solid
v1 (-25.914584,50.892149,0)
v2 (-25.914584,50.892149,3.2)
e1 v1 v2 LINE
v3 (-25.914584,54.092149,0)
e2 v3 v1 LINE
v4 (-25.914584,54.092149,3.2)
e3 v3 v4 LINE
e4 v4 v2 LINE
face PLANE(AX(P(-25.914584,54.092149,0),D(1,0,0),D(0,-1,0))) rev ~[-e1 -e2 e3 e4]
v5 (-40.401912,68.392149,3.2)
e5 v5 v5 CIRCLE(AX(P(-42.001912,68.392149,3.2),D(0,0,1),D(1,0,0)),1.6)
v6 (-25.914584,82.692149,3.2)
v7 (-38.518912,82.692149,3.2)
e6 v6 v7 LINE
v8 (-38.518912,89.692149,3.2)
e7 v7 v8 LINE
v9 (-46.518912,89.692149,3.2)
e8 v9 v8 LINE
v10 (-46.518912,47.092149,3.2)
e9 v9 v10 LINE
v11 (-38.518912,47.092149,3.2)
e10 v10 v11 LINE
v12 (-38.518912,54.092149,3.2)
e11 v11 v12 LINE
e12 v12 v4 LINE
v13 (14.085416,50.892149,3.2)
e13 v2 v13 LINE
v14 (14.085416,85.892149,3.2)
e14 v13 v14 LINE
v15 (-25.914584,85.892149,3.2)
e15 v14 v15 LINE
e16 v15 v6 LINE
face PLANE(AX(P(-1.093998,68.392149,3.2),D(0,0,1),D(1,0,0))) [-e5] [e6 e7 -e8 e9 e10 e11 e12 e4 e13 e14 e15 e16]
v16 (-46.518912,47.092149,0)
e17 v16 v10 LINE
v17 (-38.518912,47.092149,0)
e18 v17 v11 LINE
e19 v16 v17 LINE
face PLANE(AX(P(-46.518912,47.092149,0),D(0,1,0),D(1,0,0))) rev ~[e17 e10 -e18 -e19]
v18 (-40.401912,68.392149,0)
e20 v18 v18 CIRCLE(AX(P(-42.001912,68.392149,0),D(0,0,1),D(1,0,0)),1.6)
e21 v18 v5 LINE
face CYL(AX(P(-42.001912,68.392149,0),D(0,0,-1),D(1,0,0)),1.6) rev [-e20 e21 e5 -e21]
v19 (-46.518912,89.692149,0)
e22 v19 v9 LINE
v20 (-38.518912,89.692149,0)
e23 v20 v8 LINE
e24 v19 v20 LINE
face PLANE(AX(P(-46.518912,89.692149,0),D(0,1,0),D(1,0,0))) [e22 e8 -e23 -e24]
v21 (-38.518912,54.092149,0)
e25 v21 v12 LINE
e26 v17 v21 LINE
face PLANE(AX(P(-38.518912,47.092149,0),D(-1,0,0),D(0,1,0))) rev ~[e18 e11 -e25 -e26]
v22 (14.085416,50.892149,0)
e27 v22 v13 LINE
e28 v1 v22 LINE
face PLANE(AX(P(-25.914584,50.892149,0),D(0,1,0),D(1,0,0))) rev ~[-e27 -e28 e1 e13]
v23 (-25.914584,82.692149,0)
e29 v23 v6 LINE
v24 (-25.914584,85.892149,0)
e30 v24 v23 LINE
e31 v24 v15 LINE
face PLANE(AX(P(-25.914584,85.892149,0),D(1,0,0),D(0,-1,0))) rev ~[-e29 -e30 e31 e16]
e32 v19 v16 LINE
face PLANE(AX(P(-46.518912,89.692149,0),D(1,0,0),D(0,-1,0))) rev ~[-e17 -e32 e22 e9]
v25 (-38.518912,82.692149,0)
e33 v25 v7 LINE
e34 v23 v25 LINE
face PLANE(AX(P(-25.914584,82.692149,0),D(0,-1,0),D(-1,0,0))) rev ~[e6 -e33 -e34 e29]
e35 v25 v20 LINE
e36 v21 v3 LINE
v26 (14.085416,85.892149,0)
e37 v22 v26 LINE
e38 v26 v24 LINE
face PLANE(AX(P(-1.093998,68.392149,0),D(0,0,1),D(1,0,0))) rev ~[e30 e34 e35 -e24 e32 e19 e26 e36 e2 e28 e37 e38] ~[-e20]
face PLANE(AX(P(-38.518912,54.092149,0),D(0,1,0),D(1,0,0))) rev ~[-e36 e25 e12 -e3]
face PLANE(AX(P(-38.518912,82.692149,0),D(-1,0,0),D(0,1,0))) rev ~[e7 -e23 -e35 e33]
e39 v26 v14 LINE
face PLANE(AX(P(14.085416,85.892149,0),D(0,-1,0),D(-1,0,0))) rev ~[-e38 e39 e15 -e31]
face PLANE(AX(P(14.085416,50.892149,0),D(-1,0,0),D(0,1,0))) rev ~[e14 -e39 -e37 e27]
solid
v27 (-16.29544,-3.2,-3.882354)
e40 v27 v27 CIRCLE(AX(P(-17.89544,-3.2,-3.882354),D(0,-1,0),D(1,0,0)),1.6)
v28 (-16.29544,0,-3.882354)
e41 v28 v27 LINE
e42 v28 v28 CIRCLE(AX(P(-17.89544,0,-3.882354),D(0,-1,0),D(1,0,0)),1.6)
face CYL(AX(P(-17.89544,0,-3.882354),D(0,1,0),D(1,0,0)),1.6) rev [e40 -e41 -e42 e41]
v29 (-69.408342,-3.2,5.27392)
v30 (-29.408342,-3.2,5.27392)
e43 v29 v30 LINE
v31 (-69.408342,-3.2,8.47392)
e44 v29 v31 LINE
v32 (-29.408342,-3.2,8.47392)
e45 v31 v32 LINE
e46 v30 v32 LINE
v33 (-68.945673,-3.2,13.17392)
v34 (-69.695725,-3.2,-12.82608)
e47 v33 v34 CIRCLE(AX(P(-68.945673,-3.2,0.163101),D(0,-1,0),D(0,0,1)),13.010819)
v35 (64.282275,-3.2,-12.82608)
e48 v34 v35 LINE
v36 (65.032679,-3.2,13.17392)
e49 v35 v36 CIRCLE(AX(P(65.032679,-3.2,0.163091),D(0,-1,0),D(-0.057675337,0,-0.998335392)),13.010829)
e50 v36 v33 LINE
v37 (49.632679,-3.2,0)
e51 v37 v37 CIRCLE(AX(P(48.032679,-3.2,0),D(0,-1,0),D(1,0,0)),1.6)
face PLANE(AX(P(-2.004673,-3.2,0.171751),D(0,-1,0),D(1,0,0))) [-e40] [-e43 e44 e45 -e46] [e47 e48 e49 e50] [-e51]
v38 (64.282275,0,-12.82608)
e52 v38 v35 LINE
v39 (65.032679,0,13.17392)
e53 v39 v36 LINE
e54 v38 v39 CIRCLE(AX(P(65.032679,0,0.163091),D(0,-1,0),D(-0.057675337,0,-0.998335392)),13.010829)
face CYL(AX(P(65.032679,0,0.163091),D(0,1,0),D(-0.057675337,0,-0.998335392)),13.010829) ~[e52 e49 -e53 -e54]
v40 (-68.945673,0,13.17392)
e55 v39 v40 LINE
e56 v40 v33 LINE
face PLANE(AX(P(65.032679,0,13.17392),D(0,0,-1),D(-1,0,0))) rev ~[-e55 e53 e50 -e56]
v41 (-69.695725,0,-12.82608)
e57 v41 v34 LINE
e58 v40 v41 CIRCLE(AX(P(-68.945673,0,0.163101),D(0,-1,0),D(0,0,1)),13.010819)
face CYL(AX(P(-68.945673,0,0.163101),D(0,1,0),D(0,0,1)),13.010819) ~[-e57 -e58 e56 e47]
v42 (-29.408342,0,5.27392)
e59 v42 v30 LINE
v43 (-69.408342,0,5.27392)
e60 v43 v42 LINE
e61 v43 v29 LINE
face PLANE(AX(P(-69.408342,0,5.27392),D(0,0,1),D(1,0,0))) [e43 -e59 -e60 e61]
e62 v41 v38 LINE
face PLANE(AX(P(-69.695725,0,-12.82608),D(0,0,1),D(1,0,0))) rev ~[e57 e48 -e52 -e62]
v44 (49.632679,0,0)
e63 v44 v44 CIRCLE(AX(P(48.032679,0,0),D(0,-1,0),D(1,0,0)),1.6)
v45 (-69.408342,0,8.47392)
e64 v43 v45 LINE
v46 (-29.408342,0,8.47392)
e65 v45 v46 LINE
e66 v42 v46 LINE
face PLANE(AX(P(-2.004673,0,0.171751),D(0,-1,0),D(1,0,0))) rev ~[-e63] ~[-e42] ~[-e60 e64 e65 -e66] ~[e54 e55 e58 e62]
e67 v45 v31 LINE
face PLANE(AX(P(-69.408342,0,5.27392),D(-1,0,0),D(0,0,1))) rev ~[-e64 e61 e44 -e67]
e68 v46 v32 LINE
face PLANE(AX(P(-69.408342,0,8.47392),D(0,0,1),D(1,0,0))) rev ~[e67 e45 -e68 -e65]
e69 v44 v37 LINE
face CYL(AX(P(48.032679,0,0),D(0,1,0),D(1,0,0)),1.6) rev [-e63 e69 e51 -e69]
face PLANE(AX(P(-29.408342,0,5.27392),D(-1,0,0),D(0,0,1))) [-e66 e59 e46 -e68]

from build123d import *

# Parameters (mm, degrees)
F0_R     = 1.6
F0_W     = 40
F0_H     = 3.2
F1_DEPTH = 3.2
F2_R     = 1.6
F2_W     = 39.3956717427
F2_H     = 28.6
F2_W_2   = 8
F2_H_2   = 7
F3_DEPTH = 3.2


# Not quite as in the source:
# - a feature names something its author has since deleted; it is built from what else it names


with BuildPart() as f1:
    # F0 (on Front) → F1 (new body)
    with BuildSketch(Plane.XZ):
        with BuildLine():
            ThreePointArc((64.2822751435, -12.8260802654), (78.0380924464, -0.2122674413), (65.0326790919, 13.1739197346))
            Line((65.0326790919, 13.1739197346), (-68.9456731455, 13.1739197346))
            ThreePointArc((-68.9456731455, 13.1739197346), (-81.9510814202, 0.5382828094), (-69.6957248565, -12.8260802654))
            Line((-69.6957248565, -12.8260802654), (64.2822751435, -12.8260802654))
        make_face()
        with Locations((-17.8954396397, -3.8823541254)):
            Circle(F0_R, mode=Mode.SUBTRACT)
        with Locations((48.0326790919, 0)):
            Circle(F0_R, mode=Mode.SUBTRACT)
        with Locations((-49.4083422422, 6.8739197346)):
            Rectangle(F0_W, F0_H, mode=Mode.SUBTRACT)
    extrude(amount=F1_DEPTH)


with BuildPart() as f3:
    # F2 (on Top) → F3 (new body)
    with BuildSketch(Plane.XY):
        Polygon((14.0854157835, 50.8921488531), (14.0854157835, 85.8921488531), (-25.9145842165, 85.8921488531), (-25.9145842165, 82.6921488531), (13.4810875262, 82.6921488531), (13.4810875262, 54.0921488531), (-25.9145842165, 54.0921488531), (-25.9145842165, 50.8921488531), align=None)
        Polygon((-25.9145842165, 54.0921488531), (-25.9145842165, 82.6921488531), (-38.5189124738, 82.6921488531), (-46.5189124738, 82.6921488531), (-46.5189124738, 54.0921488531), (-38.5189124738, 54.0921488531), align=None)
        with Locations((-42.0019124738, 68.3921488531)):
            Circle(F2_R, mode=Mode.SUBTRACT)
        with Locations((-6.2167483452, 68.3921488531)):
            Rectangle(F2_W, F2_H)
        with Locations((-42.5189124738, 86.1921488531)):
            Rectangle(F2_W_2, F2_H_2)
        with Locations((-42.5189124738, 50.5921488531)):
            Rectangle(F2_W_2, F2_H_2)
    extrude(amount=F3_DEPTH)


solid = Compound([f1.part, f3.part])
